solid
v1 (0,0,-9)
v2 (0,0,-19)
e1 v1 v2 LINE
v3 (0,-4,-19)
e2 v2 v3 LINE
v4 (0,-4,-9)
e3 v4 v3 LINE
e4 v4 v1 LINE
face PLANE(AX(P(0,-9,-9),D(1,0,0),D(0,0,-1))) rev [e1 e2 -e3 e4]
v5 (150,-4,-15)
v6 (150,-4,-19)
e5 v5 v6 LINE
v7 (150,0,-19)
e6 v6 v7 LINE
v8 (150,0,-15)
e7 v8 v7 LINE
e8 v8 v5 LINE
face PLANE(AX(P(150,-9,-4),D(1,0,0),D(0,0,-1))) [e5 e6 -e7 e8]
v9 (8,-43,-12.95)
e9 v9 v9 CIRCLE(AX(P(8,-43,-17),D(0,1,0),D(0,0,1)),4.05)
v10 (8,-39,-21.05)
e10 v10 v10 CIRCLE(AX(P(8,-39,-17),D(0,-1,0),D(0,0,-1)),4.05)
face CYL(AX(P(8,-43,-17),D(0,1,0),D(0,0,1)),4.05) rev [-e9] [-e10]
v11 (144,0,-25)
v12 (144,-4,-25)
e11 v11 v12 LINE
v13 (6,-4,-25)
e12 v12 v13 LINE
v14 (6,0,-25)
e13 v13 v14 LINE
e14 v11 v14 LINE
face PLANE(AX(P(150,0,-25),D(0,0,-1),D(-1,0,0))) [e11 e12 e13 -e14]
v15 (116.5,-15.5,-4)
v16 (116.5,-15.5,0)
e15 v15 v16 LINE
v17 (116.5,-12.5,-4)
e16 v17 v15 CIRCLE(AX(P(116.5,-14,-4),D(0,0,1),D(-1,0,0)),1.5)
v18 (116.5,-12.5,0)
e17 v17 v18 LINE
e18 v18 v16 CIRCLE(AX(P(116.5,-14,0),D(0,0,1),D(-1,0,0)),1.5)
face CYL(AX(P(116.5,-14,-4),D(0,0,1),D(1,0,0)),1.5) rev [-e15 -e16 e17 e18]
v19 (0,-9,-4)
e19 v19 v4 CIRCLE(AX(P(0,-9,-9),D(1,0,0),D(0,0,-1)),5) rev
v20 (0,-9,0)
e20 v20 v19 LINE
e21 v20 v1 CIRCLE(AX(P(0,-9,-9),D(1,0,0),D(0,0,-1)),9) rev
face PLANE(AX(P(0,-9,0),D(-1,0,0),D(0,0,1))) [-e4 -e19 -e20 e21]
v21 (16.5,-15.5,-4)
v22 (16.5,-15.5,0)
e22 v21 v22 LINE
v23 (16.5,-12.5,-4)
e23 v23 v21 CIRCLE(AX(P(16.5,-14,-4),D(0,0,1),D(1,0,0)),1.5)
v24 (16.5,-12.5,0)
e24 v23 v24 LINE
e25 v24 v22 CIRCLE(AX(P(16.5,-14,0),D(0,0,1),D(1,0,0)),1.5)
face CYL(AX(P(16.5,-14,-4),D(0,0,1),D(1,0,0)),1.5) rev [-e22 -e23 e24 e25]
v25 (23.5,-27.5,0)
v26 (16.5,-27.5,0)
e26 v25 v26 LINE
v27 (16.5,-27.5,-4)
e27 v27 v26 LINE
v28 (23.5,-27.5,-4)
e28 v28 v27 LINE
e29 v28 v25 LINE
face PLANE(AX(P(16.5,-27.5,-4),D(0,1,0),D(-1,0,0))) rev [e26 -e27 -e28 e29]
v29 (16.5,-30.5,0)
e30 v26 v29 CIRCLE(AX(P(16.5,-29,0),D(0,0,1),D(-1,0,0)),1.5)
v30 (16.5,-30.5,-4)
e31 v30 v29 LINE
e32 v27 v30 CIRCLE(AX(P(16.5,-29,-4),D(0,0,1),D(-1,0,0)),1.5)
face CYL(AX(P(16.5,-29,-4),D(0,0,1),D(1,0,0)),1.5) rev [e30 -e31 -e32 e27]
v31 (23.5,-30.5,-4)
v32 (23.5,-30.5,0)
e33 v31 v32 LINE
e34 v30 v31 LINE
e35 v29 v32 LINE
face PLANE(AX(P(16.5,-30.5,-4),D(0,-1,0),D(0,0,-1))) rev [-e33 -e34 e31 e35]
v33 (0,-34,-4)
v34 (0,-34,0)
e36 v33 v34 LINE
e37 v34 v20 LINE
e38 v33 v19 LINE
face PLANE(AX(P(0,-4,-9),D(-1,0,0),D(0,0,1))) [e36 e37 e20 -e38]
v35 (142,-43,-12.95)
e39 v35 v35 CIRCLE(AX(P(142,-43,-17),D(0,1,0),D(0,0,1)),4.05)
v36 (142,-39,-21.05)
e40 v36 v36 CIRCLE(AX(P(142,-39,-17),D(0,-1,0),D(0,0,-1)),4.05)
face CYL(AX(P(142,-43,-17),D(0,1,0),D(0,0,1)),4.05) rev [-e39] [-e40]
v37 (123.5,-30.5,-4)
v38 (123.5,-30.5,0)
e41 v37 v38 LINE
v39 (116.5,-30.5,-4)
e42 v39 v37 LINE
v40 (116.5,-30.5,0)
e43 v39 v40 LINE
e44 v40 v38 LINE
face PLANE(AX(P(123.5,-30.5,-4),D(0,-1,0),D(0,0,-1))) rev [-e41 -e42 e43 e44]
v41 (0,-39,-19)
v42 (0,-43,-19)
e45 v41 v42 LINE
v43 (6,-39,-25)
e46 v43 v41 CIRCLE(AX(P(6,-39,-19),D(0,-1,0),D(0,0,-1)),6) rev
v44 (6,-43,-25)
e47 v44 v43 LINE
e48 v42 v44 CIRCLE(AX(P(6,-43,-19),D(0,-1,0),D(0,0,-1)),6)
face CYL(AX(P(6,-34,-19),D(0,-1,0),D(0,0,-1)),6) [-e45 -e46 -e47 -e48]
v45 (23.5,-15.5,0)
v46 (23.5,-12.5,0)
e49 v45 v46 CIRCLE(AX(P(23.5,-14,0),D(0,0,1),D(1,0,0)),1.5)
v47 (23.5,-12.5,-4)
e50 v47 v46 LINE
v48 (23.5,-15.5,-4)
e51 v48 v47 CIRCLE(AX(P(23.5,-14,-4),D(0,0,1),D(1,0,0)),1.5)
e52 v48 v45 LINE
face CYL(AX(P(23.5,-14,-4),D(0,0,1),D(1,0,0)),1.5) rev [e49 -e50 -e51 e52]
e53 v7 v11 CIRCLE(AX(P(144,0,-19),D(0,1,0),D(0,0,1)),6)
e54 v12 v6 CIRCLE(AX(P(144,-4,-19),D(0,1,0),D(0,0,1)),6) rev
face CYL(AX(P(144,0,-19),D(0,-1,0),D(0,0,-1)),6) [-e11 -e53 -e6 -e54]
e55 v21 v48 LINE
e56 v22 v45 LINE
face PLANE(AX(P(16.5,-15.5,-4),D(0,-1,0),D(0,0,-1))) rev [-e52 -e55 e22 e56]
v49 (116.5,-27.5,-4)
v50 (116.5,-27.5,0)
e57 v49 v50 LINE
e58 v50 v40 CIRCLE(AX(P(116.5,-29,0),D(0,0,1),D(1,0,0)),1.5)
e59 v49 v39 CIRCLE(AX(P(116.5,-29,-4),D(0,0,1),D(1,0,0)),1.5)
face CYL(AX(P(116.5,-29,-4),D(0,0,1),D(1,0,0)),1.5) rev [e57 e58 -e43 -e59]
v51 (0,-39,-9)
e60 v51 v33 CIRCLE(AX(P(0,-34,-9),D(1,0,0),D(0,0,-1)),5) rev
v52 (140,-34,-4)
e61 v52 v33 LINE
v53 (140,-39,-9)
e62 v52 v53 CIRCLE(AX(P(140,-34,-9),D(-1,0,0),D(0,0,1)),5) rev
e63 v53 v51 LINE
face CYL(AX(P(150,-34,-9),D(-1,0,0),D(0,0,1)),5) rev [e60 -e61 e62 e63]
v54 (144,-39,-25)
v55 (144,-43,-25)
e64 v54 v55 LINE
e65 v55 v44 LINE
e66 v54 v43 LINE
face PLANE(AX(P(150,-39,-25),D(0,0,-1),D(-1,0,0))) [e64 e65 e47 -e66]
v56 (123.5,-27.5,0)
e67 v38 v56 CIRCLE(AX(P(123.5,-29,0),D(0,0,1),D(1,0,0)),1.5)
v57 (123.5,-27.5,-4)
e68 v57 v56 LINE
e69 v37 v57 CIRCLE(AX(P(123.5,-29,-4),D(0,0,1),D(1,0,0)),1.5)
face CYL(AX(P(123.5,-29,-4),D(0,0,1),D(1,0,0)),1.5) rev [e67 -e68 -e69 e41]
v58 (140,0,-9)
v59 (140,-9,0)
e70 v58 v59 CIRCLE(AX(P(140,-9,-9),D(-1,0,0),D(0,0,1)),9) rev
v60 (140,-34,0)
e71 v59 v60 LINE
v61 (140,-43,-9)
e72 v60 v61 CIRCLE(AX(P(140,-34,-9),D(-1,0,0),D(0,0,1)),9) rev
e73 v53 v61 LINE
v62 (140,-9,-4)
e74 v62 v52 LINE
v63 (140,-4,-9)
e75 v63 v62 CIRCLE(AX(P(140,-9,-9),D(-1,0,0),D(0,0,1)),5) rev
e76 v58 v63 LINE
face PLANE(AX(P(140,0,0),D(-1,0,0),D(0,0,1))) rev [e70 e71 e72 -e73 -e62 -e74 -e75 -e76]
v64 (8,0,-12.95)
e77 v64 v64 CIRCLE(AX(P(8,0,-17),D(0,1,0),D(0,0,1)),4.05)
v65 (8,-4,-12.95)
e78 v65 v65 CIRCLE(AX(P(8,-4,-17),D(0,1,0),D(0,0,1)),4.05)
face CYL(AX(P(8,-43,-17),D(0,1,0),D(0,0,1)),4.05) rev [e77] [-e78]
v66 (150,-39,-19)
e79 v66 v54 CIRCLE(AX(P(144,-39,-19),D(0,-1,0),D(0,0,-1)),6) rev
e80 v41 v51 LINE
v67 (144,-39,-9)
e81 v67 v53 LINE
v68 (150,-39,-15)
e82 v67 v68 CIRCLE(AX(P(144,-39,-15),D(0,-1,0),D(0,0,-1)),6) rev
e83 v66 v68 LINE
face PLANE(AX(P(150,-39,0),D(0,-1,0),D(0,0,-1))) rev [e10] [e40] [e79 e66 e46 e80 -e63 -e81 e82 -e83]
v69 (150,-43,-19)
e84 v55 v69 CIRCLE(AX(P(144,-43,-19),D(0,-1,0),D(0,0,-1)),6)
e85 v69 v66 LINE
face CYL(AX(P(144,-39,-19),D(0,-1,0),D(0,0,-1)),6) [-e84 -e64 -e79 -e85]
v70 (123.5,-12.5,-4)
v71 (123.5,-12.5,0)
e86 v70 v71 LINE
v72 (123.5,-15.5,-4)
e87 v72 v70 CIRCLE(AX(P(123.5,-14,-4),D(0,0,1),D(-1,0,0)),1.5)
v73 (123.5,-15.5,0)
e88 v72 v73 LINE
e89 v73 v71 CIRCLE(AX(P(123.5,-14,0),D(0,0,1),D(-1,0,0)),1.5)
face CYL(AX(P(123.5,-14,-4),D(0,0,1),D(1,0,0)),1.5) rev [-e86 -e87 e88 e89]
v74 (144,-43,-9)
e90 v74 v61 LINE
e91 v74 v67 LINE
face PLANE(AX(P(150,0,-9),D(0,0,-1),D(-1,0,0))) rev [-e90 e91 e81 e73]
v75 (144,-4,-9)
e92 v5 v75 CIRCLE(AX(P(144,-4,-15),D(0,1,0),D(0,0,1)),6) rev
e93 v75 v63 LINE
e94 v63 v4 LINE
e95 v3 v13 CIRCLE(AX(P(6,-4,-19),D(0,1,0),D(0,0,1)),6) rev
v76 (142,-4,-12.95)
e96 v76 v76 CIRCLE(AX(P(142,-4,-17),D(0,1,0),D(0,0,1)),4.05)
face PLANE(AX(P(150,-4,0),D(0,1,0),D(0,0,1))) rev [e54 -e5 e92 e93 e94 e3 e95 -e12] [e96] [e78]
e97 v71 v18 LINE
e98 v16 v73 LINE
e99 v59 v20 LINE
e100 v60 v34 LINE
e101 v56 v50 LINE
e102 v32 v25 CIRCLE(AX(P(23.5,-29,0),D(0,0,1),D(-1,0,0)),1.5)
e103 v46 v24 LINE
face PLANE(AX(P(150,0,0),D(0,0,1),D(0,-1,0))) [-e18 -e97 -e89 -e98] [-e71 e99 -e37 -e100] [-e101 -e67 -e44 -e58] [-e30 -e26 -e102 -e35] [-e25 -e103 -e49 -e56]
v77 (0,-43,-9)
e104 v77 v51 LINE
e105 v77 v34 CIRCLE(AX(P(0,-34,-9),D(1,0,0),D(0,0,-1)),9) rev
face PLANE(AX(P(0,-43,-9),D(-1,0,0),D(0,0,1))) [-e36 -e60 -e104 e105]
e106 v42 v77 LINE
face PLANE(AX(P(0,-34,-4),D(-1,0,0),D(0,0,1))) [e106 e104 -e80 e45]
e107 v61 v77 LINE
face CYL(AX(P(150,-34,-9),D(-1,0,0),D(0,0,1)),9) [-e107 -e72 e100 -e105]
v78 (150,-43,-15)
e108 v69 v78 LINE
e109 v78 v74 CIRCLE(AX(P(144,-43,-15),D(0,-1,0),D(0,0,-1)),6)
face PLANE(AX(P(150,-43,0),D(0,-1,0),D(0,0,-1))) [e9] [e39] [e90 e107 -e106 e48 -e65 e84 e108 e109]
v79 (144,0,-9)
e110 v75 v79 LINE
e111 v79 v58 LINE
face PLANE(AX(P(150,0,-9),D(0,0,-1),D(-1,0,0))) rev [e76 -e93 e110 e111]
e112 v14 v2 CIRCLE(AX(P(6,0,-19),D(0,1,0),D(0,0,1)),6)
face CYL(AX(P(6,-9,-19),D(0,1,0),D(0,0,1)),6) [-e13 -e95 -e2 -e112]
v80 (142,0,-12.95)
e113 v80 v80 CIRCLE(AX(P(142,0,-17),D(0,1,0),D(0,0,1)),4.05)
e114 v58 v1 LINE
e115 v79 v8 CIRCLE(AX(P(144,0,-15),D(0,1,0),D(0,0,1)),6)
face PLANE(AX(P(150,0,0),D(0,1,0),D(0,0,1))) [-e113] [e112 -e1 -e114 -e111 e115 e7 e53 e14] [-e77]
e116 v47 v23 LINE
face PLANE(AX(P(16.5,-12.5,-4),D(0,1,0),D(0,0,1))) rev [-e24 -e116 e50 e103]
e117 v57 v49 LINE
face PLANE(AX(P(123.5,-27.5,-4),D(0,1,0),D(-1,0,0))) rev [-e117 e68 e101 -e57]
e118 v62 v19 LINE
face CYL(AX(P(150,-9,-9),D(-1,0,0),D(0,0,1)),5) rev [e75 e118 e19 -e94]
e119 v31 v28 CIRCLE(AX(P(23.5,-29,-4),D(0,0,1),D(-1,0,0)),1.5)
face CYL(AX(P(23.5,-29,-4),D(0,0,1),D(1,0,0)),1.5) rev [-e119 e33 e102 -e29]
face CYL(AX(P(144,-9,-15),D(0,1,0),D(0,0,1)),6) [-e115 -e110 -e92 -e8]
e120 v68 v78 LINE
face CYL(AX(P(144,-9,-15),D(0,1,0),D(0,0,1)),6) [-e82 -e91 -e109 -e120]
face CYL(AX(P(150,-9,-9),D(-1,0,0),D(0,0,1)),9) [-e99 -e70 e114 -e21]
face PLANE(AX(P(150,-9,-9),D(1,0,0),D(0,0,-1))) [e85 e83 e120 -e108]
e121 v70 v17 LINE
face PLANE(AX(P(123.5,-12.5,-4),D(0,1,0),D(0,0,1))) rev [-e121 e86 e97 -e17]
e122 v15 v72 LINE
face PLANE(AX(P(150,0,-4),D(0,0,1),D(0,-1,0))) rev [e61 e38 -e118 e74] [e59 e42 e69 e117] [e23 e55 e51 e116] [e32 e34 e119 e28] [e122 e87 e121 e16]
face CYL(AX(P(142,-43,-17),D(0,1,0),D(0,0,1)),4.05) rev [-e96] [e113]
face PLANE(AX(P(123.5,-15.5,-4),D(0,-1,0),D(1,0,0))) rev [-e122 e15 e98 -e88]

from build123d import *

# Parameters (mm, degrees)
EXTRUSION_DEPTH  = 150
SKETCH_4_R       = 4.05
HOLES_DEPTH      = 159.031642401
SKETCH_5_W       = 10
SKETCH_5_H       = 9
SLOT_DEPTH       = 159.031642401
FILLET_2_R       = 6
MORE_HOLES_DEPTH = 4


# Sheet-metal steps are written as plain solids
with BuildPart() as part:
    # Sketch 1 → Extrusion (new body)
    with BuildSketch(Plane(origin=(0, 0, 0), x_dir=(0, 0, -1), z_dir=(1, 0, 0))):
        with BuildLine():
            Line((25, -43), (9, -43))
            ThreePointArc((9, -43), (2.636038969, -40.363961031), (0, -34))
            Line((0, -34), (0, -9))
            ThreePointArc((0, -9), (2.636038969, -2.636038969), (9, 0))
            Line((9, 0), (25, 0))
            Line((25, 0), (25, -4))
            Line((25, -4), (9, -4))
            ThreePointArc((9, -4), (5.464466094, -5.464466094), (4, -9))
            Line((4, -9), (4, -34))
            ThreePointArc((4, -34), (5.464466094, -37.535533906), (9, -39))
            Line((9, -39), (25, -39))
            Line((25, -39), (25, -43))
        make_face()
    extrude(amount=EXTRUSION_DEPTH)

    # Эскиз4 → Holes (cut, through all)
    with BuildSketch(Plane(origin=(0, 0, 0), x_dir=(1, 0, 0), z_dir=(0, 1, 0))):
        with Locations(Location((8, 17, 0), (0, 0, 270))):
            Circle(SKETCH_4_R)
        with Locations(Location((142, 17, 0), (0, 0, 270))):
            Circle(SKETCH_4_R)
    extrude(amount=-HOLES_DEPTH, mode=Mode.SUBTRACT)

    # Эскиз5 → SLot (cut, through all)
    with BuildSketch(Plane.XZ.offset(43)):
        with Locations((145, -4.5)):
            Rectangle(SKETCH_5_W, SKETCH_5_H)
    extrude(amount=-SLOT_DEPTH, mode=Mode.SUBTRACT)

    # Fillet 2
    fillet_2_edges = [part.edges().sort_by_distance(p)[0] for p in [
        (0, -41, -25),
        (0, -2, -25),
        (150, -41, -25),
        (150, -2, -9),
        (150, -41, -9),
        (150, -2, -25),
    ]]
    fillet(fillet_2_edges, radius=FILLET_2_R)

    # Эскиз6 → More Holes (cut)
    with BuildSketch(Plane.XY):
        with BuildLine():
            Line((16.5, -12.5), (23.5, -12.5))
            ThreePointArc((23.5, -12.5), (25, -14), (23.5, -15.5))
            Line((23.5, -15.5), (16.5, -15.5))
            ThreePointArc((16.5, -15.5), (15, -14), (16.5, -12.5))
        make_face()
        with BuildLine():
            Line((123.5, -12.5), (116.5, -12.5))
            ThreePointArc((116.5, -12.5), (115, -14), (116.5, -15.5))
            Line((116.5, -15.5), (123.5, -15.5))
            ThreePointArc((123.5, -15.5), (125, -14), (123.5, -12.5))
        make_face()
        with BuildLine():
            Line((123.5, -30.5), (116.5, -30.5))
            ThreePointArc((116.5, -30.5), (115, -29), (116.5, -27.5))
            Line((116.5, -27.5), (123.5, -27.5))
            ThreePointArc((123.5, -27.5), (125, -29), (123.5, -30.5))
        make_face()
        with BuildLine():
            Line((16.5, -30.5), (23.5, -30.5))
            ThreePointArc((23.5, -30.5), (25, -29), (23.5, -27.5))
            Line((23.5, -27.5), (16.5, -27.5))
            ThreePointArc((16.5, -27.5), (15, -29), (16.5, -30.5))
        make_face()
    extrude(amount=-MORE_HOLES_DEPTH, mode=Mode.SUBTRACT)


solid = part.part
